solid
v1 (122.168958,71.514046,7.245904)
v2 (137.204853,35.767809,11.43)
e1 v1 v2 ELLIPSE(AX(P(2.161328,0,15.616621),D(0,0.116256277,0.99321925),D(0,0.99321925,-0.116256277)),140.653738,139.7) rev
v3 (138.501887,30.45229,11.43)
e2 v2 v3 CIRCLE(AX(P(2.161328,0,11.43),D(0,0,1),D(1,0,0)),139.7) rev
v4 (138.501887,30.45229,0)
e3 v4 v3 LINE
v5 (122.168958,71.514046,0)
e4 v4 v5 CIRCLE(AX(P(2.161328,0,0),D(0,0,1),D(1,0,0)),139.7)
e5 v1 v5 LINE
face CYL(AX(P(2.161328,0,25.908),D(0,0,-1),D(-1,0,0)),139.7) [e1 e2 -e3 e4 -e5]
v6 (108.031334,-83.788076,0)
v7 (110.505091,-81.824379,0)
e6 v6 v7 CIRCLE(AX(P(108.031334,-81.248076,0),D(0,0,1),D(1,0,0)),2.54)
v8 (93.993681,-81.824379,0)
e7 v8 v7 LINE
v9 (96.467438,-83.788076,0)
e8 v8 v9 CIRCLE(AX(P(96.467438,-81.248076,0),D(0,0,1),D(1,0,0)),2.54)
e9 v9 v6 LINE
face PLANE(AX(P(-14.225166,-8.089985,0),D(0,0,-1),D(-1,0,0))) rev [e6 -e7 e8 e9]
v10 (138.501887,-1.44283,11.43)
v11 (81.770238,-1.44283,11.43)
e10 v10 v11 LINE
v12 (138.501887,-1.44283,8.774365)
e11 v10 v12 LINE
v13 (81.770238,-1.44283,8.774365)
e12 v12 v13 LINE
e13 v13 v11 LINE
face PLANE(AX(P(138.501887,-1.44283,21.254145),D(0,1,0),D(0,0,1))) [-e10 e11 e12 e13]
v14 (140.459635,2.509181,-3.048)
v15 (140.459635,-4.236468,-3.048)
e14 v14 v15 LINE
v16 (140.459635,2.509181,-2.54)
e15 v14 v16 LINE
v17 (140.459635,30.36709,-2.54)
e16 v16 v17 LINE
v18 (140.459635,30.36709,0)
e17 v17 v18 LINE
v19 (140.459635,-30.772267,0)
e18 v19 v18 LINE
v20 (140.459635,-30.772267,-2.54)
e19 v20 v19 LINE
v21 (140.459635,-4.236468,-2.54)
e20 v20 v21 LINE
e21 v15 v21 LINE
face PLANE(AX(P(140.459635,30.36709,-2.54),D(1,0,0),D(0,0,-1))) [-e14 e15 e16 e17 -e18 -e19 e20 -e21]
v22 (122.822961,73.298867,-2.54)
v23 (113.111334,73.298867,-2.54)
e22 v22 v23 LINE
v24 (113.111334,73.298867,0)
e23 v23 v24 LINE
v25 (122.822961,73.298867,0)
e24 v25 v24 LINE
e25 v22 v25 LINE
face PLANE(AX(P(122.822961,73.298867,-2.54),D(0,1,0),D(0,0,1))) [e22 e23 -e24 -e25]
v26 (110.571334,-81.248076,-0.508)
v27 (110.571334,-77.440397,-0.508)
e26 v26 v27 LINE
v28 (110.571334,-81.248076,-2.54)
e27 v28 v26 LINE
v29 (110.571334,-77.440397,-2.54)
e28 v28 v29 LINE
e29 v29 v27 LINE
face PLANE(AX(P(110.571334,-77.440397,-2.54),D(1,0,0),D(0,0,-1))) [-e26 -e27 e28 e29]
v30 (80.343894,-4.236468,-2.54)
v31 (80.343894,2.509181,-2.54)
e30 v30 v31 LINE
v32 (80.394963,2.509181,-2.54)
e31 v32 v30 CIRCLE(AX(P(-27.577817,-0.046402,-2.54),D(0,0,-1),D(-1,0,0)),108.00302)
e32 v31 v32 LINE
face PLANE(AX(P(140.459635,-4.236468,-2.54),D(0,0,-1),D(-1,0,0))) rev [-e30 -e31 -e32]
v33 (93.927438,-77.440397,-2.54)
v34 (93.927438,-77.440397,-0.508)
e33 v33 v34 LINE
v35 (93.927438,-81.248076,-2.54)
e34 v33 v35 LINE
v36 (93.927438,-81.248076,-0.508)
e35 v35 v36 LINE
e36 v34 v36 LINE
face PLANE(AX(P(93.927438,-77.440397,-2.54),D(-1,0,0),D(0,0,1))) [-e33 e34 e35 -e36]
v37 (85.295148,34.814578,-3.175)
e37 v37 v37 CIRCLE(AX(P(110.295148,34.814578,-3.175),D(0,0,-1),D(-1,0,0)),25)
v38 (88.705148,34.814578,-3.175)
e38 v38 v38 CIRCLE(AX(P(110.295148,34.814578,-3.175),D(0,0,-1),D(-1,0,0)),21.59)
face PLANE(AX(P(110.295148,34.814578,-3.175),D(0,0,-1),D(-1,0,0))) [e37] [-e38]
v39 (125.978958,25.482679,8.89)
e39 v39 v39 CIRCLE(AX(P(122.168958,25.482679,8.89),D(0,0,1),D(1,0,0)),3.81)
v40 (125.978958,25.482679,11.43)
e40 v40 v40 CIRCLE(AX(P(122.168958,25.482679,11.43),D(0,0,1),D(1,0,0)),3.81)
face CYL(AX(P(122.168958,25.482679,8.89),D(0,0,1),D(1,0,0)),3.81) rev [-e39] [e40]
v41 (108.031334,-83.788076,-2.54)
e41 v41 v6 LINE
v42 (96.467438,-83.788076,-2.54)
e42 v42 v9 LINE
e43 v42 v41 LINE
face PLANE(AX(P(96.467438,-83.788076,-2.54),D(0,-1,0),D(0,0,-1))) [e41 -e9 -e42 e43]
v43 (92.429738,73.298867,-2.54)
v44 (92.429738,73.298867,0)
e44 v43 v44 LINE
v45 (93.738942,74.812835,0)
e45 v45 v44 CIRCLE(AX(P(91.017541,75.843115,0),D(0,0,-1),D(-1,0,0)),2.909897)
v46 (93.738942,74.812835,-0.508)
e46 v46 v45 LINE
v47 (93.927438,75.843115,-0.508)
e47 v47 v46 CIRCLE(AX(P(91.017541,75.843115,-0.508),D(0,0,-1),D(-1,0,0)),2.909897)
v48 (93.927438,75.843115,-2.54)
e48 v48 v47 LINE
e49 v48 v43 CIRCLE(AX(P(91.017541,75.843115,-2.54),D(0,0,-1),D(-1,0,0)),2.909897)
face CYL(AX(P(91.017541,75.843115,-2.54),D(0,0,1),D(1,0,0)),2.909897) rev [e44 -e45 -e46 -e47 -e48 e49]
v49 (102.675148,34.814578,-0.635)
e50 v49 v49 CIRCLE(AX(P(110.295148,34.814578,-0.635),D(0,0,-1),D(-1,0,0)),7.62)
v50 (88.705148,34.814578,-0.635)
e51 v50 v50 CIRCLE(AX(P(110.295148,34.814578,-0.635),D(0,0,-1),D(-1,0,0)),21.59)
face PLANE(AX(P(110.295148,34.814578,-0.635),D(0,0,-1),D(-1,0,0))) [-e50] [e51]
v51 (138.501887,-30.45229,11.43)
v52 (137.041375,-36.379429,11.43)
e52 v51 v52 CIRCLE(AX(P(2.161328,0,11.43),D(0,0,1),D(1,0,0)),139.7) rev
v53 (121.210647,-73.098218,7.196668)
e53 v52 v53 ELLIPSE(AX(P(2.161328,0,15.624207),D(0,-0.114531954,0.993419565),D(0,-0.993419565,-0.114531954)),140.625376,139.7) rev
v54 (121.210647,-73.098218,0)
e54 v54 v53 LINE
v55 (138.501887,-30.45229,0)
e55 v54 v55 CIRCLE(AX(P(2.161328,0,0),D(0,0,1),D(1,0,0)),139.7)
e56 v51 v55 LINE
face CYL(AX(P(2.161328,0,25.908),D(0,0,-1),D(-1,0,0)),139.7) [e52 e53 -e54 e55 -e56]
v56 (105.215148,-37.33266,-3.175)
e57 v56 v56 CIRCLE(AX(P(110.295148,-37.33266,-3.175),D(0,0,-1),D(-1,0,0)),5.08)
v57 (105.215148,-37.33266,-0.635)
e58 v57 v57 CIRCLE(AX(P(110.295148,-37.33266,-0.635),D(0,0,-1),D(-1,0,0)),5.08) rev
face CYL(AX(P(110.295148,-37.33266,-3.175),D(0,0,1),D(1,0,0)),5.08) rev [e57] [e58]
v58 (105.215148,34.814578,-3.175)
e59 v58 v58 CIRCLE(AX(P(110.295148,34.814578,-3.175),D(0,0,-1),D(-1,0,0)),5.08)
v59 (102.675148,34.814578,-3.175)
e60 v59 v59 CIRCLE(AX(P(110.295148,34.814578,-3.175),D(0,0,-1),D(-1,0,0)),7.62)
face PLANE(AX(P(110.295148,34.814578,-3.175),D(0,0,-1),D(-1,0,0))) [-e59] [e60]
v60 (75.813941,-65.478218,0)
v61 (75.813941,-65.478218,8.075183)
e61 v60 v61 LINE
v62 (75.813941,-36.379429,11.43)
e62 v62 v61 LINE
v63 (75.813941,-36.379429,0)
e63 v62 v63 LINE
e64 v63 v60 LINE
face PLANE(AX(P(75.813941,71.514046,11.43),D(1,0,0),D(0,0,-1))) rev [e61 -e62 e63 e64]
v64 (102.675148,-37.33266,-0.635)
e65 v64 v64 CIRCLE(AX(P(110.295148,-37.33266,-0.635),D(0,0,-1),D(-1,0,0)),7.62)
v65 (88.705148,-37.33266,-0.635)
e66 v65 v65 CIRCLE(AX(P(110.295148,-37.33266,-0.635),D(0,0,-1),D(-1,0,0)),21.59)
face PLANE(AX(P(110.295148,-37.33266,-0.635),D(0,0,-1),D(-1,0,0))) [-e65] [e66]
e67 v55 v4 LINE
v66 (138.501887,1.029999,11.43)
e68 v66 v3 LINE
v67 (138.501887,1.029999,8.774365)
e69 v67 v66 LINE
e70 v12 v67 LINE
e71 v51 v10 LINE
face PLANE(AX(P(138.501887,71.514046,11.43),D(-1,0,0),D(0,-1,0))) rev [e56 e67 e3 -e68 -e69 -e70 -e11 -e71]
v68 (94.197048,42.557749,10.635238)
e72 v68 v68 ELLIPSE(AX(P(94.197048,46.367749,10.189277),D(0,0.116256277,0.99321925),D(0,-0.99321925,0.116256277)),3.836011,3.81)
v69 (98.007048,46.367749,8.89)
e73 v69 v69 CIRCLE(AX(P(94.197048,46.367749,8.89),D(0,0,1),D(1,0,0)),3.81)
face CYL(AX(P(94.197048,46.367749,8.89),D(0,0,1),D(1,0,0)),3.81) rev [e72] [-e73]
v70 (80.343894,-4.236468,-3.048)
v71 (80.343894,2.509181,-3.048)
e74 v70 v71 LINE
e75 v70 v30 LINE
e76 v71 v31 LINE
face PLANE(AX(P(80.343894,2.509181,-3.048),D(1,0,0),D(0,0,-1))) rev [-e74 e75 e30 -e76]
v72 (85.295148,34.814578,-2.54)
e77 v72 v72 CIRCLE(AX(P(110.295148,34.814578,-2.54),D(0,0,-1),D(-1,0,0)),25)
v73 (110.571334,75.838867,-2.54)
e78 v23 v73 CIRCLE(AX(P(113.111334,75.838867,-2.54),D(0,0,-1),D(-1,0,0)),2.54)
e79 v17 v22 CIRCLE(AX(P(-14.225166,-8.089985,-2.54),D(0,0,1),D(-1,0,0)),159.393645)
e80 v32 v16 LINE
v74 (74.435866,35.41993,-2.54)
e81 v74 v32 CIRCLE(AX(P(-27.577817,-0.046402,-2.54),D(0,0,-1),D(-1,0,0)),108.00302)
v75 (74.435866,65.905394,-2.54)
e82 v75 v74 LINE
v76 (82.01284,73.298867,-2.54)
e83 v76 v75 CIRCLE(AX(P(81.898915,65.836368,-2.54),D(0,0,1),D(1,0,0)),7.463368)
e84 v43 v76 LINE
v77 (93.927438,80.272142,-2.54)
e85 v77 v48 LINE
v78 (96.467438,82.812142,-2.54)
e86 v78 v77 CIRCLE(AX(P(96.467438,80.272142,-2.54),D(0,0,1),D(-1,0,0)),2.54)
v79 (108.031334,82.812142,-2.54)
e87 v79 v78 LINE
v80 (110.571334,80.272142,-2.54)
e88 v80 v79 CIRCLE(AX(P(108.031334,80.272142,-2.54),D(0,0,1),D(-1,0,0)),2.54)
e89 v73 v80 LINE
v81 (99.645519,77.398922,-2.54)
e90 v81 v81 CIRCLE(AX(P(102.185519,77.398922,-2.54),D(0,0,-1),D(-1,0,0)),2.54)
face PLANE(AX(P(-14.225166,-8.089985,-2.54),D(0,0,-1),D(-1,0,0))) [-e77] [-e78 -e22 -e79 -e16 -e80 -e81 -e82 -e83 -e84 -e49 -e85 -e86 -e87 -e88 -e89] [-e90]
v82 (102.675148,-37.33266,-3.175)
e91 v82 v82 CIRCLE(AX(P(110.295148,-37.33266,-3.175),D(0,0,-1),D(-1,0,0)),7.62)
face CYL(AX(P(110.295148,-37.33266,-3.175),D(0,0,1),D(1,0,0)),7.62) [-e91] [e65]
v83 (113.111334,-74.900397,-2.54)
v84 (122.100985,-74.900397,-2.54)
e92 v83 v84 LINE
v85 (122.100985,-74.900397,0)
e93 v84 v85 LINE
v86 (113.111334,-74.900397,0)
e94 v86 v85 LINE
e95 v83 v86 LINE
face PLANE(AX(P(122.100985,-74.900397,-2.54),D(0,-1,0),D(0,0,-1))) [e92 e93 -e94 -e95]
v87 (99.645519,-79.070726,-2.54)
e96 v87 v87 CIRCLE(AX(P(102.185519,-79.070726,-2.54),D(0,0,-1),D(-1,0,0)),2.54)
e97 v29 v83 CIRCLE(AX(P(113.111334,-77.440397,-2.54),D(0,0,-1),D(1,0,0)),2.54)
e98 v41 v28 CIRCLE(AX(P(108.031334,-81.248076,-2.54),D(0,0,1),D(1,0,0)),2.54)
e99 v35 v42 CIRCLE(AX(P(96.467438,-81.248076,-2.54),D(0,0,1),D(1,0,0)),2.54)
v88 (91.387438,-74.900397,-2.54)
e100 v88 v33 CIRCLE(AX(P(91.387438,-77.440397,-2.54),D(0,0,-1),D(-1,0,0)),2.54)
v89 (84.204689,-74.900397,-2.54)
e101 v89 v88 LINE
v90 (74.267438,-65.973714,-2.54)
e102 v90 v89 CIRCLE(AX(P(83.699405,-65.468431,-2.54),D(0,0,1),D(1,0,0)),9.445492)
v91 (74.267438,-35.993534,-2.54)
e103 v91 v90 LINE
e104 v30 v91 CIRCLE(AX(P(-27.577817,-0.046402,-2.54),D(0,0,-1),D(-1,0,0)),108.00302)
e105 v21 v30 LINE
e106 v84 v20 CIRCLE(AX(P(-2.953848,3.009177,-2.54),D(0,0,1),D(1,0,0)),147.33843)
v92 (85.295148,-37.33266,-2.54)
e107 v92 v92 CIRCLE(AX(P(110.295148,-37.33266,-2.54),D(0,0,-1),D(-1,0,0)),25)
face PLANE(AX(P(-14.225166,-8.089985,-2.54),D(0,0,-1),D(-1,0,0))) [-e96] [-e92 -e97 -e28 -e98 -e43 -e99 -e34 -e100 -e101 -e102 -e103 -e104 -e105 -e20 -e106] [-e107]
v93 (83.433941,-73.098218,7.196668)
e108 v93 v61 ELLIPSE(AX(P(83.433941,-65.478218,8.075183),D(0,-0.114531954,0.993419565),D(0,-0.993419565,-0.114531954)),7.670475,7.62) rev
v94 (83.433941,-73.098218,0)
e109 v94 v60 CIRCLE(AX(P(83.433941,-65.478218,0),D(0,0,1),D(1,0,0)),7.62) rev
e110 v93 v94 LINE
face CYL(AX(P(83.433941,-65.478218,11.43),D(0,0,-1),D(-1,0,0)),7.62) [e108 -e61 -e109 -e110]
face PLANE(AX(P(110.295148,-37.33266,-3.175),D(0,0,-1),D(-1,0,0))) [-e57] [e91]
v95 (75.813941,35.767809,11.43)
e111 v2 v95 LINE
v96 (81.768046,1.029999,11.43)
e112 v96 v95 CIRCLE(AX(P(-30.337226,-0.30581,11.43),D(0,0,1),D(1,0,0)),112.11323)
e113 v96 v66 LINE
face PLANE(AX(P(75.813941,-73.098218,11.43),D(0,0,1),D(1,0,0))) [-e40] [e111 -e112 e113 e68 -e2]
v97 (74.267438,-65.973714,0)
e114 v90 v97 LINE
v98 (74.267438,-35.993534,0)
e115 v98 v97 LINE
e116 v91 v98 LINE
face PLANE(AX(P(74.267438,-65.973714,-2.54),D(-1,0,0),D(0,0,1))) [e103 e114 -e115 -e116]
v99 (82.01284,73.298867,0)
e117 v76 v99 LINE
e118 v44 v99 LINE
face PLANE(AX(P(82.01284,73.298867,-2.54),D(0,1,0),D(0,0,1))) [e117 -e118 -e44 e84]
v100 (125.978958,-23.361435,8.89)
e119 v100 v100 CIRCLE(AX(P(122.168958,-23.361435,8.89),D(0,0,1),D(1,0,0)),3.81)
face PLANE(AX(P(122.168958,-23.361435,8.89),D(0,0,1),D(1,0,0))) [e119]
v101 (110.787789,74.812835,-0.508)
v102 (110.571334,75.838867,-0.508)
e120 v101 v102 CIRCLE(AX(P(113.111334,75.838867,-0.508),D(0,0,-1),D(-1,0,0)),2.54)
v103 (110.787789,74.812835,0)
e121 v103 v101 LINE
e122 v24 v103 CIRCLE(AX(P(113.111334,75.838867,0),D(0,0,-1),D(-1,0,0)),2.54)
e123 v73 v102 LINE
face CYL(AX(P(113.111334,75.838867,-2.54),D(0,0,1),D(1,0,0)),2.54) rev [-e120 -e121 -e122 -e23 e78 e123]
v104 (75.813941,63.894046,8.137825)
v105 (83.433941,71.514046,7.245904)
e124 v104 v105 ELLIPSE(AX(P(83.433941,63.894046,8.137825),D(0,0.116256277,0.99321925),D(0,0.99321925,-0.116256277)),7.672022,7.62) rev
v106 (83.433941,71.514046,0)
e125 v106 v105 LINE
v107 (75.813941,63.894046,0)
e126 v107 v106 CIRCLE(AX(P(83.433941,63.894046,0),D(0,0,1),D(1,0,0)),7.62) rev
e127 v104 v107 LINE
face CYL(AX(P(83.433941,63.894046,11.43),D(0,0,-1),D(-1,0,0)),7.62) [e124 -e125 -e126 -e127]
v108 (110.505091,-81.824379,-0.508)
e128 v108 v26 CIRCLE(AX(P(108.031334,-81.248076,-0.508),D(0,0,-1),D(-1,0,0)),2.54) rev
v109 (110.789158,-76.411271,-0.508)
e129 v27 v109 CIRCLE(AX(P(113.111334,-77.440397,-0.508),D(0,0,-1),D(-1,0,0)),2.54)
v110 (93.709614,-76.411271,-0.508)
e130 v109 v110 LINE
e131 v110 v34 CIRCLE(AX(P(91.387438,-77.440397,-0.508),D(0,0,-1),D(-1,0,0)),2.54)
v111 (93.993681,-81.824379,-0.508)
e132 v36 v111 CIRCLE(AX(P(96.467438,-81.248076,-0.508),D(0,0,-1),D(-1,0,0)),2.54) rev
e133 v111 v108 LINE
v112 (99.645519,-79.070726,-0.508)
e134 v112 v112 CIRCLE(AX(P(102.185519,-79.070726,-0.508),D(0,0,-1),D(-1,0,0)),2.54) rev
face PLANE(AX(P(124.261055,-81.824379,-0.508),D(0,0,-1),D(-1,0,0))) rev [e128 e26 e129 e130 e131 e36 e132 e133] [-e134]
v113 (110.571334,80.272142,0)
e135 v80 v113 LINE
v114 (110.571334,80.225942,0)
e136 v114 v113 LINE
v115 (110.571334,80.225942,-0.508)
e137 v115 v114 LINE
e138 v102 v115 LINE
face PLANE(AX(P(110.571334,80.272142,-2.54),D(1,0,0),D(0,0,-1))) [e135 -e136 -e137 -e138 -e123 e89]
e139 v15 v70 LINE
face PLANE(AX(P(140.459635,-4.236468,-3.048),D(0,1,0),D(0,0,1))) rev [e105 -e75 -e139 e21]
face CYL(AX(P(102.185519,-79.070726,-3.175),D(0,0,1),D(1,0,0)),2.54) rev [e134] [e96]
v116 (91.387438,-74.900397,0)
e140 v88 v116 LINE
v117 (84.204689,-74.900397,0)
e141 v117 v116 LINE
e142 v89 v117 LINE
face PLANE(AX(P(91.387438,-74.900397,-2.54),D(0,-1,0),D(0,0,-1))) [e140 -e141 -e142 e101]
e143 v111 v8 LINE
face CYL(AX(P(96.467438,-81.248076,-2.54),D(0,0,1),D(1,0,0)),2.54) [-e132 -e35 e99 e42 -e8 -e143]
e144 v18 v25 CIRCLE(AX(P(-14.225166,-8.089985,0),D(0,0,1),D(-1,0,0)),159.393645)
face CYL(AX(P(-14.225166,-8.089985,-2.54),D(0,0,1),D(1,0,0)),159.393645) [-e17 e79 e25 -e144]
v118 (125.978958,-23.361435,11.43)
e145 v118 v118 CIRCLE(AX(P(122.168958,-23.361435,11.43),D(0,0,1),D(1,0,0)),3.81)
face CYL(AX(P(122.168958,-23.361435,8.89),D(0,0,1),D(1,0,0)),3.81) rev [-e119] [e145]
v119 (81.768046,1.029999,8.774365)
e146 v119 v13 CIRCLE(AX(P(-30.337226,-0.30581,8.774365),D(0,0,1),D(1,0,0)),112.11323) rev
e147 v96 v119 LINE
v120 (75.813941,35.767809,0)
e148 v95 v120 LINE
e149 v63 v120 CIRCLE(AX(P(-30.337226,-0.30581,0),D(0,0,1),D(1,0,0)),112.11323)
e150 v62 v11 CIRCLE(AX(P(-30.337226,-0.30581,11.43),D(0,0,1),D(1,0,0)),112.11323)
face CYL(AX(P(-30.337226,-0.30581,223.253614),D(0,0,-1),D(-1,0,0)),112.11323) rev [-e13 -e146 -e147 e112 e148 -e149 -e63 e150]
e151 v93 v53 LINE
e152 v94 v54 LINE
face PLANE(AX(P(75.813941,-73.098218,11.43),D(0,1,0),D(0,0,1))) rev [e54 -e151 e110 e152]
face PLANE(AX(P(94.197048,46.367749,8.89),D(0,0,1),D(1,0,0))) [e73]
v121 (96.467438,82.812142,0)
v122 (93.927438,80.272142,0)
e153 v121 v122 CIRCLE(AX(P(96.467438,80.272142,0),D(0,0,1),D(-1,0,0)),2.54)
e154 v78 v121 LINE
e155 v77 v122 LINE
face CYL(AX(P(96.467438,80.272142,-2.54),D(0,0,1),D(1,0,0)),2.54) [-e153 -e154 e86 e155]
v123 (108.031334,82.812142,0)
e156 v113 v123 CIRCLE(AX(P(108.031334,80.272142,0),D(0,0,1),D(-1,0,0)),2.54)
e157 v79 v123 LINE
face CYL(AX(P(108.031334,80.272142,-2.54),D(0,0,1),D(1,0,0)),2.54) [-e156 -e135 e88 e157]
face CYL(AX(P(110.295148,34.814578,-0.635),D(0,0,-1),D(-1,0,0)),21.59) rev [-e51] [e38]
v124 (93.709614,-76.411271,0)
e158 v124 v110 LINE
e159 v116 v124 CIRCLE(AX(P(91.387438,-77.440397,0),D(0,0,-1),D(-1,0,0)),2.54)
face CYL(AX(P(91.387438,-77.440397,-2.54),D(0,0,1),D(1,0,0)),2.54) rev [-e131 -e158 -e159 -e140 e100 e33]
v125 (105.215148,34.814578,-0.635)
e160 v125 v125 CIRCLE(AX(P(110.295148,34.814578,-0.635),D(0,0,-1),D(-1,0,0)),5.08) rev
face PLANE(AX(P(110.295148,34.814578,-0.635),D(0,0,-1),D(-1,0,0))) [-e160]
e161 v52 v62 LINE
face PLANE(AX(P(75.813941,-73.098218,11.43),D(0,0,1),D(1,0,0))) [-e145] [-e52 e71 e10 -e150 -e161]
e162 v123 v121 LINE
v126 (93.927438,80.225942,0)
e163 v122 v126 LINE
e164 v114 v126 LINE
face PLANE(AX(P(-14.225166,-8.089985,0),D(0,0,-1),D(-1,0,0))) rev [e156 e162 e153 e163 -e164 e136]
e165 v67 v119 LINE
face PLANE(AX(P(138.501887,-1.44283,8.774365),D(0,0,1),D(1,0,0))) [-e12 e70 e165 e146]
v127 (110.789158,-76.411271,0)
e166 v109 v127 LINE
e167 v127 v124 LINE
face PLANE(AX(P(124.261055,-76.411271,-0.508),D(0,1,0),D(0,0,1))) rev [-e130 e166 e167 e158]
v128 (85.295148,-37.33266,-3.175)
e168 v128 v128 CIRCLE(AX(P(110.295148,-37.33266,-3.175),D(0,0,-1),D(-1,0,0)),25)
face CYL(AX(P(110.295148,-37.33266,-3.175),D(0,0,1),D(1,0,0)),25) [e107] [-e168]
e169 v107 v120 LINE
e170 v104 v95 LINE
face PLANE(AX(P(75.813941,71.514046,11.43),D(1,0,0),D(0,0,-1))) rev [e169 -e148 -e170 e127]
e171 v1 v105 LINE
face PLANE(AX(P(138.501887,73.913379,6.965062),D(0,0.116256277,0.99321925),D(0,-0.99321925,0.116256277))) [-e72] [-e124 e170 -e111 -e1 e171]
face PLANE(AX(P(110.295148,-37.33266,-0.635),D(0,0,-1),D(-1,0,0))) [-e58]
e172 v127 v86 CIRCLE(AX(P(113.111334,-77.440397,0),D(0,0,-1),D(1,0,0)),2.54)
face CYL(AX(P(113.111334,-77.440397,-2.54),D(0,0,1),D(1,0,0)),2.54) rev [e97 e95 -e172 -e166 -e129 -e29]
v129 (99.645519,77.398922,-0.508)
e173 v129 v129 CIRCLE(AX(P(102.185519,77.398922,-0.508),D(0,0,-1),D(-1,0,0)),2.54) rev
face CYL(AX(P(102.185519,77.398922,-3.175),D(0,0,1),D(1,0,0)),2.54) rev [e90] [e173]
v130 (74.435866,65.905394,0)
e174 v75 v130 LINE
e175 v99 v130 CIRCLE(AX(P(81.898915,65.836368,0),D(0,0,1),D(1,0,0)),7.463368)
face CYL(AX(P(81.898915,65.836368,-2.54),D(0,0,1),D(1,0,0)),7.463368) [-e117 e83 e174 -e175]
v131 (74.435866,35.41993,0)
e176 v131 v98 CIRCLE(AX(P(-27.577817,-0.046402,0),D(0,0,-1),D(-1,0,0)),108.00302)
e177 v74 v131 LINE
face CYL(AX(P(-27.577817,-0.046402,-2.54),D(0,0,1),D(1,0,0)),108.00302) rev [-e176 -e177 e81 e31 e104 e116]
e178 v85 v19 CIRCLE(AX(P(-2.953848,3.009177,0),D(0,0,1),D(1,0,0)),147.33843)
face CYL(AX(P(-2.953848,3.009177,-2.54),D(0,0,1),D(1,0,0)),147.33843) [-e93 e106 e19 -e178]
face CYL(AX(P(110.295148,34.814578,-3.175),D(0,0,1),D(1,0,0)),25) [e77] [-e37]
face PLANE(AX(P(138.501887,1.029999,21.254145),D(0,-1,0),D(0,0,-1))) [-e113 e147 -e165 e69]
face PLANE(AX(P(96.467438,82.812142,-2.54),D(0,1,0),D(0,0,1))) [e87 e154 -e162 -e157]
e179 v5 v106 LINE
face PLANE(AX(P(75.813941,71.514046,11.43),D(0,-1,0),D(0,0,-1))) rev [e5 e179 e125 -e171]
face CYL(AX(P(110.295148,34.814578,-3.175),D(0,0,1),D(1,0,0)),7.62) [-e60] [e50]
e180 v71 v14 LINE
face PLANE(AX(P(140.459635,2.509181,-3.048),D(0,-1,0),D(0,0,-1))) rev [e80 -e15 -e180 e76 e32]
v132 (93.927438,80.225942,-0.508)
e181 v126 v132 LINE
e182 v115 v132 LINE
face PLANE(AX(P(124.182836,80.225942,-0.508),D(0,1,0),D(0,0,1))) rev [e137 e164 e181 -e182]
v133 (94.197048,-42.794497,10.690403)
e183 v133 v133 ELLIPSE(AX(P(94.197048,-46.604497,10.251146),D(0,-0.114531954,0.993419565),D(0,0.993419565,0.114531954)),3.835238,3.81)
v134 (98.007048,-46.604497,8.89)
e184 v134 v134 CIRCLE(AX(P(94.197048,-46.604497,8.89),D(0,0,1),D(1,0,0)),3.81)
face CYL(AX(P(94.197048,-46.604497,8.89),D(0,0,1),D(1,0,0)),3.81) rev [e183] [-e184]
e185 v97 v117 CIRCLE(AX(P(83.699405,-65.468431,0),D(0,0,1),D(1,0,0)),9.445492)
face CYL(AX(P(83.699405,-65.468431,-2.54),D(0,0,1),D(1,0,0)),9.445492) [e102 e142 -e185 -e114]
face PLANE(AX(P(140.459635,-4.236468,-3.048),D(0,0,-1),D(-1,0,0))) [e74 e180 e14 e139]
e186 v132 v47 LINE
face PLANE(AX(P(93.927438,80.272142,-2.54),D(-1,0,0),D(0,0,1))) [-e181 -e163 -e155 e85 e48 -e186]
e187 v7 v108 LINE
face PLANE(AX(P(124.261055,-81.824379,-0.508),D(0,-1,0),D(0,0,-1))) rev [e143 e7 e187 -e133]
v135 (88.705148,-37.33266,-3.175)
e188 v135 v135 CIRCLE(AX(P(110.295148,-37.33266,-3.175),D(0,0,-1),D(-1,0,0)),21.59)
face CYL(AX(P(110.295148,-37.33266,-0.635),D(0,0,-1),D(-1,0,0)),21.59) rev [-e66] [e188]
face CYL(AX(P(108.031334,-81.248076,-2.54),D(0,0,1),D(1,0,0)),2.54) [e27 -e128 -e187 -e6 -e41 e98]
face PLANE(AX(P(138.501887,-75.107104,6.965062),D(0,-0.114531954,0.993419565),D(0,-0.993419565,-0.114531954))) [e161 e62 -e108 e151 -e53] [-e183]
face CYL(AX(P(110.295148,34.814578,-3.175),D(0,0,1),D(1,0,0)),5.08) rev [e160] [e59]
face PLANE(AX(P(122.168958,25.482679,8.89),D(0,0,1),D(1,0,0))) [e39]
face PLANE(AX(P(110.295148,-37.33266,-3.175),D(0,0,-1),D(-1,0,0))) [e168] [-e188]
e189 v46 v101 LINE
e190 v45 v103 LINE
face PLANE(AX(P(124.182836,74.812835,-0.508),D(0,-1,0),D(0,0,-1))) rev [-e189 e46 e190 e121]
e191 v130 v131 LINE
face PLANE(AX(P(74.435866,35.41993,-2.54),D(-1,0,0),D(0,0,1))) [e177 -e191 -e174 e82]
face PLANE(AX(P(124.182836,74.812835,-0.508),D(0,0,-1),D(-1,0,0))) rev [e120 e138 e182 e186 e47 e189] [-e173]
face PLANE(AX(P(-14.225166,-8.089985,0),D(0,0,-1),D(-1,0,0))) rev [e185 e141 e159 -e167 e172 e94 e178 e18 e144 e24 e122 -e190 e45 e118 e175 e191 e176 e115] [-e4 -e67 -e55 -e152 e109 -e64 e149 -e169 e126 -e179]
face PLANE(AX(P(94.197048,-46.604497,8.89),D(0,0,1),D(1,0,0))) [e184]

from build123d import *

# Parameters (mm, degrees)
SKETCH2_W               = 62.687945492
SKETCH2_H               = 144.612264151
EXTRUDE1_DEPTH          = 11.43
CUT_EXTRUDE2_DEPTH      = 158.024733797
CUT_EXTRUDE2_DEPTH_BACK = 158.024733797
FILLET1_R               = 7.62
CUT_EXTRUDE3_DEPTH      = 158.024733797
CUT_EXTRUDE4_DEPTH      = 11.43
SKETCH6_W               = 12.479780257
SKETCH6_H               = 2.472828988
CUT_EXTRUDE5_DEPTH      = 158.024733797
SKETCH7_R               = 3.81
CUT_EXTRUDE6_DEPTH      = 2.54
EXTRUDE2_DEPTH          = 2.54
SKETCH13_R              = 25
EXTRUDE4_DEPTH          = 0.635
SKETCH14_R              = 21.59
CUT_EXTRUDE7_DEPTH      = 2.54
SKETCH15_R              = 7.62
SKETCH15_R_2            = 5.08
EXTRUDE5_DEPTH          = 2.54
SKETCH16_R              = 2.54
CUT_EXTRUDE8_DEPTH      = 164.951198757
SKETCH17_W              = 37.108426787
SKETCH17_H              = 5.41310776
CUT_EXTRUDE9_DEPTH      = 0.508
SKETCH18_W              = 60.115740974
SKETCH18_H              = 6.745649024
EXTRUDE6_DEPTH          = 0.508


# Read off the part's stored shape, not the designer's step: Cut-Extrude4
with BuildPart() as part:
    # Sketch2 → Extrude1 (new body)
    with BuildSketch(Plane.XY):
        with Locations((107.157914046, -0.792085953)):
            Rectangle(SKETCH2_W, SKETCH2_H)
    extrude(amount=EXTRUDE1_DEPTH)

    # Sketch3 → Cut-Extrude2 (cut, two sides: drawn at the far end of the back side and taken through both)
    with BuildSketch(Plane.XY.offset(11.43).offset(-CUT_EXTRUDE2_DEPTH_BACK)):
        with BuildLine():
            Line((-8.245884216, 283.124432333), (75.8139413, 35.767808979))
            ThreePointArc((75.8139413, 35.767808979), (81.776003849, -0.305809979), (75.8139413, -36.379428938))
            Line((75.8139413, -36.379428938), (-8.245884216, -283.736052291))
            Line((-8.245884216, -283.736052291), (-530.745083766, -283.736052291))
            Line((-530.745083766, -283.736052291), (-530.745083766, 283.124432333))
            Line((-530.745083766, 283.124432333), (-8.245884216, 283.124432333))
        make_face()
    extrude(amount=CUT_EXTRUDE2_DEPTH + CUT_EXTRUDE2_DEPTH_BACK, mode=Mode.SUBTRACT)

    # Fillet1
    fillet1_edges = [part.edges().sort_by_distance(p)[0] for p in [
        (75.8139413, 71.514046122, 5.715),
        (138.501886792, 71.514046122, 5.715),
        (138.501886792, -73.098218029, 5.715),
        (75.8139413, -73.098218029, 5.715),
    ]]
    fillet(fillet1_edges, radius=FILLET1_R)

    # Sketch4 → Cut-Extrude3 (cut, through all)
    with BuildSketch(Plane(origin=(0, 0, 0), x_dir=(0, 0, -1), z_dir=(1, 0, 0))):
        Polygon((-6.9650624, -75.107104489), (-11.43, -36.379428938), (-27.808277113, -36.379428938), (-27.808277113, -75.107104489), align=None)
        Polygon((-6.9650624, 73.913379264), (-11.43, 35.767808979), (-27.808277113, 35.767808979), (-27.808277113, 73.913379264), align=None)
    extrude(amount=CUT_EXTRUDE3_DEPTH, mode=Mode.SUBTRACT)

    # Cut-Extrude4 outline → Cut-Extrude4 (cut)
    with BuildSketch(Plane.XY):
        with BuildLine():
            Line((130.881886792, 71.514046122), (122.168957501, 71.514046122))
            ThreePointArc((122.168957501, 71.514046122), (131.969322241, 51.63307619), (138.501886792, 30.452289734))
            Line((138.501886792, 30.452289734), (138.501886792, 63.894046122))
            ThreePointArc((138.501886792, 63.894046122), (136.270040464, 69.282199795), (130.881886792, 71.514046122))
        make_face()
        with BuildLine():
            Line((138.501886792, -65.478218029), (138.501886792, -30.452289734))
            ThreePointArc((138.501886792, -30.452289734), (131.624319899, -52.492129451), (121.210647413, -73.098218029))
            Line((121.210647413, -73.098218029), (130.881886792, -73.098218029))
            ThreePointArc((130.881886792, -73.098218029), (136.270040465, -70.866371702), (138.501886792, -65.478218029))
        make_face()
    extrude(amount=CUT_EXTRUDE4_DEPTH, mode=Mode.SUBTRACT)

    # Sketch6 → Cut-Extrude5 (cut, through all)
    with BuildSketch(Plane(origin=(0, 0, 0), x_dir=(0, 0, -1), z_dir=(1, 0, 0))):
        with Locations((-15.014254811, -0.20641593)):
            Rectangle(SKETCH6_W, SKETCH6_H)
    extrude(amount=CUT_EXTRUDE5_DEPTH, mode=Mode.SUBTRACT)

    # Sketch7 → Cut-Extrude6 (cut)
    with BuildSketch(Plane.XY.offset(11.43)):
        with Locations((122.168957501, 25.482679021)):
            Circle(SKETCH7_R)
        with Locations((122.168957501, -23.361435355)):
            Circle(SKETCH7_R)
        with Locations((94.197047539, -46.60449668)):
            Circle(SKETCH7_R)
        with Locations((94.197047539, 46.367748617)):
            Circle(SKETCH7_R)
    extrude(amount=-CUT_EXTRUDE6_DEPTH, mode=Mode.SUBTRACT)

    # Sketch11 → Extrude2 (add)
    with BuildSketch(Plane.XY):
        with BuildLine():
            Line((140.459634853, 30.367090459), (140.459634853, -30.772266502))
            ThreePointArc((140.459634853, -30.772266502), (133.081559649, -53.585706853), (122.100984967, -74.900397422))
            Line((122.100984967, -74.900397422), (113.111333503, -74.900397422))
            ThreePointArc((113.111333503, -74.900397422), (111.315282279, -75.644346198), (110.571333503, -77.440397422))
            Line((110.571333503, -77.440397422), (110.571333503, -81.248075827))
            ThreePointArc((110.571333503, -81.248075827), (109.827384728, -83.044127051), (108.031333503, -83.788075827))
            Line((108.031333503, -83.788075827), (96.467437878, -83.788075827))
            ThreePointArc((96.467437878, -83.788075827), (94.671386654, -83.044127051), (93.927437878, -81.248075827))
            Line((93.927437878, -81.248075827), (93.927437878, -77.440397422))
            ThreePointArc((93.927437878, -77.440397422), (93.183489102, -75.644346198), (91.387437878, -74.900397422))
            Line((91.387437878, -74.900397422), (84.20468933, -74.900397422))
            ThreePointArc((84.20468933, -74.900397422), (77.387287325, -72.495127974), (74.267438474, -65.97371445))
            Line((74.267438474, -65.97371445), (74.267438474, -35.993533901))
            ThreePointArc((74.267438474, -35.993533901), (80.424902626, -0.301125715), (74.435866454, 35.419929877))
            Line((74.435866454, 35.419929877), (74.435866454, 65.905394367))
            ThreePointArc((74.435866454, 65.905394367), (76.686596692, 71.178053101), (82.012839907, 73.298866609))
            Line((82.012839907, 73.298866609), (92.429737879, 73.298866609))
            ThreePointArc((92.429737879, 73.298866609), (93.525213934, 74.366945407), (93.927437878, 75.843114776))
            Line((93.927437878, 75.843114776), (93.927437878, 80.272142364))
            ThreePointArc((93.927437878, 80.272142364), (94.671386654, 82.068193588), (96.467437878, 82.812142364))
            Line((96.467437878, 82.812142364), (108.031333503, 82.812142364))
            ThreePointArc((108.031333503, 82.812142364), (109.827384728, 82.068193588), (110.571333503, 80.272142364))
            Line((110.571333503, 80.272142364), (110.571333503, 75.838866609))
            ThreePointArc((110.571333503, 75.838866609), (111.315282279, 74.042815385), (113.111333503, 73.298866609))
            Line((113.111333503, 73.298866609), (122.822960943, 73.298866609))
            ThreePointArc((122.822960943, 73.298866609), (133.212311059, 52.478361728), (140.459634853, 30.367090459))
        make_face()
    extrude(amount=-EXTRUDE2_DEPTH)

    # Sketch13 → Extrude4 (add)
    with BuildSketch(Plane(origin=(202.435743002, 23.123502913, -2.54), x_dir=(-1, 0, 0), z_dir=(0, 0, -1))):
        with Locations((92.140594683, 11.691074744)):
            Circle(SKETCH13_R)
        with Locations((92.140594683, -60.456163173)):
            Circle(SKETCH13_R)
    extrude(amount=EXTRUDE4_DEPTH)

    # Sketch14 → Cut-Extrude7 (cut)
    with BuildSketch(Plane(origin=(0, 0, -3.175), x_dir=(-1, 0, 0), z_dir=(0, 0, -1))):
        with Locations((-110.295148318, 34.814577657)):
            Circle(SKETCH14_R)
        with Locations((-110.295148318, -37.332660261)):
            Circle(SKETCH14_R)
    extrude(amount=-CUT_EXTRUDE7_DEPTH, mode=Mode.SUBTRACT)

    # Sketch15 → Extrude5 (add)
    # profile 1 of 2: a face of its own
    with BuildSketch(Plane(origin=(0, 0, -0.635), x_dir=(-1, 0, 0), z_dir=(0, 0, -1))):
        with Locations((-110.295148318, 34.814577657)):
            Circle(SKETCH15_R)
        with Locations((-110.295148318, 34.814577657)):
            Circle(SKETCH15_R_2, mode=Mode.SUBTRACT)
    # profile 2 of 2: a face of its own
    with BuildSketch(Plane(origin=(0, 0, -0.635), x_dir=(-1, 0, 0), z_dir=(0, 0, -1))):
        with Locations((-110.295148318, -37.332660261)):
            Circle(SKETCH15_R)
        with Locations((-110.295148318, -37.332660261)):
            Circle(SKETCH15_R_2, mode=Mode.SUBTRACT)
    extrude(amount=EXTRUDE5_DEPTH)

    # Sketch16 → Cut-Extrude8 (cut, through all)
    with BuildSketch(Plane.XY):
        with Locations((102.185519341, 77.398921819)):
            Circle(SKETCH16_R)
        with Locations((102.185519341, -79.070725904)):
            Circle(SKETCH16_R)
    extrude(amount=-CUT_EXTRUDE8_DEPTH, mode=Mode.SUBTRACT)

    # Sketch17 → Cut-Extrude9 (cut)
    with BuildSketch(Plane.XY):
        with Locations((105.706841443, -79.117825298)):
            Rectangle(SKETCH17_W, SKETCH17_H)
        with Locations((105.628622382, 77.519388414)):
            Rectangle(SKETCH17_W, SKETCH17_H)
    extrude(amount=-CUT_EXTRUDE9_DEPTH, mode=Mode.SUBTRACT)

    # Sketch18 → Extrude6 (add)
    with BuildSketch(Plane(origin=(0, 0, -2.54), x_dir=(-1, 0, 0), z_dir=(0, 0, -1))):
        with Locations((-110.401764366, -0.863643629)):
            Rectangle(SKETCH18_W, SKETCH18_H)
    extrude(amount=EXTRUDE6_DEPTH)


solid = part.part
